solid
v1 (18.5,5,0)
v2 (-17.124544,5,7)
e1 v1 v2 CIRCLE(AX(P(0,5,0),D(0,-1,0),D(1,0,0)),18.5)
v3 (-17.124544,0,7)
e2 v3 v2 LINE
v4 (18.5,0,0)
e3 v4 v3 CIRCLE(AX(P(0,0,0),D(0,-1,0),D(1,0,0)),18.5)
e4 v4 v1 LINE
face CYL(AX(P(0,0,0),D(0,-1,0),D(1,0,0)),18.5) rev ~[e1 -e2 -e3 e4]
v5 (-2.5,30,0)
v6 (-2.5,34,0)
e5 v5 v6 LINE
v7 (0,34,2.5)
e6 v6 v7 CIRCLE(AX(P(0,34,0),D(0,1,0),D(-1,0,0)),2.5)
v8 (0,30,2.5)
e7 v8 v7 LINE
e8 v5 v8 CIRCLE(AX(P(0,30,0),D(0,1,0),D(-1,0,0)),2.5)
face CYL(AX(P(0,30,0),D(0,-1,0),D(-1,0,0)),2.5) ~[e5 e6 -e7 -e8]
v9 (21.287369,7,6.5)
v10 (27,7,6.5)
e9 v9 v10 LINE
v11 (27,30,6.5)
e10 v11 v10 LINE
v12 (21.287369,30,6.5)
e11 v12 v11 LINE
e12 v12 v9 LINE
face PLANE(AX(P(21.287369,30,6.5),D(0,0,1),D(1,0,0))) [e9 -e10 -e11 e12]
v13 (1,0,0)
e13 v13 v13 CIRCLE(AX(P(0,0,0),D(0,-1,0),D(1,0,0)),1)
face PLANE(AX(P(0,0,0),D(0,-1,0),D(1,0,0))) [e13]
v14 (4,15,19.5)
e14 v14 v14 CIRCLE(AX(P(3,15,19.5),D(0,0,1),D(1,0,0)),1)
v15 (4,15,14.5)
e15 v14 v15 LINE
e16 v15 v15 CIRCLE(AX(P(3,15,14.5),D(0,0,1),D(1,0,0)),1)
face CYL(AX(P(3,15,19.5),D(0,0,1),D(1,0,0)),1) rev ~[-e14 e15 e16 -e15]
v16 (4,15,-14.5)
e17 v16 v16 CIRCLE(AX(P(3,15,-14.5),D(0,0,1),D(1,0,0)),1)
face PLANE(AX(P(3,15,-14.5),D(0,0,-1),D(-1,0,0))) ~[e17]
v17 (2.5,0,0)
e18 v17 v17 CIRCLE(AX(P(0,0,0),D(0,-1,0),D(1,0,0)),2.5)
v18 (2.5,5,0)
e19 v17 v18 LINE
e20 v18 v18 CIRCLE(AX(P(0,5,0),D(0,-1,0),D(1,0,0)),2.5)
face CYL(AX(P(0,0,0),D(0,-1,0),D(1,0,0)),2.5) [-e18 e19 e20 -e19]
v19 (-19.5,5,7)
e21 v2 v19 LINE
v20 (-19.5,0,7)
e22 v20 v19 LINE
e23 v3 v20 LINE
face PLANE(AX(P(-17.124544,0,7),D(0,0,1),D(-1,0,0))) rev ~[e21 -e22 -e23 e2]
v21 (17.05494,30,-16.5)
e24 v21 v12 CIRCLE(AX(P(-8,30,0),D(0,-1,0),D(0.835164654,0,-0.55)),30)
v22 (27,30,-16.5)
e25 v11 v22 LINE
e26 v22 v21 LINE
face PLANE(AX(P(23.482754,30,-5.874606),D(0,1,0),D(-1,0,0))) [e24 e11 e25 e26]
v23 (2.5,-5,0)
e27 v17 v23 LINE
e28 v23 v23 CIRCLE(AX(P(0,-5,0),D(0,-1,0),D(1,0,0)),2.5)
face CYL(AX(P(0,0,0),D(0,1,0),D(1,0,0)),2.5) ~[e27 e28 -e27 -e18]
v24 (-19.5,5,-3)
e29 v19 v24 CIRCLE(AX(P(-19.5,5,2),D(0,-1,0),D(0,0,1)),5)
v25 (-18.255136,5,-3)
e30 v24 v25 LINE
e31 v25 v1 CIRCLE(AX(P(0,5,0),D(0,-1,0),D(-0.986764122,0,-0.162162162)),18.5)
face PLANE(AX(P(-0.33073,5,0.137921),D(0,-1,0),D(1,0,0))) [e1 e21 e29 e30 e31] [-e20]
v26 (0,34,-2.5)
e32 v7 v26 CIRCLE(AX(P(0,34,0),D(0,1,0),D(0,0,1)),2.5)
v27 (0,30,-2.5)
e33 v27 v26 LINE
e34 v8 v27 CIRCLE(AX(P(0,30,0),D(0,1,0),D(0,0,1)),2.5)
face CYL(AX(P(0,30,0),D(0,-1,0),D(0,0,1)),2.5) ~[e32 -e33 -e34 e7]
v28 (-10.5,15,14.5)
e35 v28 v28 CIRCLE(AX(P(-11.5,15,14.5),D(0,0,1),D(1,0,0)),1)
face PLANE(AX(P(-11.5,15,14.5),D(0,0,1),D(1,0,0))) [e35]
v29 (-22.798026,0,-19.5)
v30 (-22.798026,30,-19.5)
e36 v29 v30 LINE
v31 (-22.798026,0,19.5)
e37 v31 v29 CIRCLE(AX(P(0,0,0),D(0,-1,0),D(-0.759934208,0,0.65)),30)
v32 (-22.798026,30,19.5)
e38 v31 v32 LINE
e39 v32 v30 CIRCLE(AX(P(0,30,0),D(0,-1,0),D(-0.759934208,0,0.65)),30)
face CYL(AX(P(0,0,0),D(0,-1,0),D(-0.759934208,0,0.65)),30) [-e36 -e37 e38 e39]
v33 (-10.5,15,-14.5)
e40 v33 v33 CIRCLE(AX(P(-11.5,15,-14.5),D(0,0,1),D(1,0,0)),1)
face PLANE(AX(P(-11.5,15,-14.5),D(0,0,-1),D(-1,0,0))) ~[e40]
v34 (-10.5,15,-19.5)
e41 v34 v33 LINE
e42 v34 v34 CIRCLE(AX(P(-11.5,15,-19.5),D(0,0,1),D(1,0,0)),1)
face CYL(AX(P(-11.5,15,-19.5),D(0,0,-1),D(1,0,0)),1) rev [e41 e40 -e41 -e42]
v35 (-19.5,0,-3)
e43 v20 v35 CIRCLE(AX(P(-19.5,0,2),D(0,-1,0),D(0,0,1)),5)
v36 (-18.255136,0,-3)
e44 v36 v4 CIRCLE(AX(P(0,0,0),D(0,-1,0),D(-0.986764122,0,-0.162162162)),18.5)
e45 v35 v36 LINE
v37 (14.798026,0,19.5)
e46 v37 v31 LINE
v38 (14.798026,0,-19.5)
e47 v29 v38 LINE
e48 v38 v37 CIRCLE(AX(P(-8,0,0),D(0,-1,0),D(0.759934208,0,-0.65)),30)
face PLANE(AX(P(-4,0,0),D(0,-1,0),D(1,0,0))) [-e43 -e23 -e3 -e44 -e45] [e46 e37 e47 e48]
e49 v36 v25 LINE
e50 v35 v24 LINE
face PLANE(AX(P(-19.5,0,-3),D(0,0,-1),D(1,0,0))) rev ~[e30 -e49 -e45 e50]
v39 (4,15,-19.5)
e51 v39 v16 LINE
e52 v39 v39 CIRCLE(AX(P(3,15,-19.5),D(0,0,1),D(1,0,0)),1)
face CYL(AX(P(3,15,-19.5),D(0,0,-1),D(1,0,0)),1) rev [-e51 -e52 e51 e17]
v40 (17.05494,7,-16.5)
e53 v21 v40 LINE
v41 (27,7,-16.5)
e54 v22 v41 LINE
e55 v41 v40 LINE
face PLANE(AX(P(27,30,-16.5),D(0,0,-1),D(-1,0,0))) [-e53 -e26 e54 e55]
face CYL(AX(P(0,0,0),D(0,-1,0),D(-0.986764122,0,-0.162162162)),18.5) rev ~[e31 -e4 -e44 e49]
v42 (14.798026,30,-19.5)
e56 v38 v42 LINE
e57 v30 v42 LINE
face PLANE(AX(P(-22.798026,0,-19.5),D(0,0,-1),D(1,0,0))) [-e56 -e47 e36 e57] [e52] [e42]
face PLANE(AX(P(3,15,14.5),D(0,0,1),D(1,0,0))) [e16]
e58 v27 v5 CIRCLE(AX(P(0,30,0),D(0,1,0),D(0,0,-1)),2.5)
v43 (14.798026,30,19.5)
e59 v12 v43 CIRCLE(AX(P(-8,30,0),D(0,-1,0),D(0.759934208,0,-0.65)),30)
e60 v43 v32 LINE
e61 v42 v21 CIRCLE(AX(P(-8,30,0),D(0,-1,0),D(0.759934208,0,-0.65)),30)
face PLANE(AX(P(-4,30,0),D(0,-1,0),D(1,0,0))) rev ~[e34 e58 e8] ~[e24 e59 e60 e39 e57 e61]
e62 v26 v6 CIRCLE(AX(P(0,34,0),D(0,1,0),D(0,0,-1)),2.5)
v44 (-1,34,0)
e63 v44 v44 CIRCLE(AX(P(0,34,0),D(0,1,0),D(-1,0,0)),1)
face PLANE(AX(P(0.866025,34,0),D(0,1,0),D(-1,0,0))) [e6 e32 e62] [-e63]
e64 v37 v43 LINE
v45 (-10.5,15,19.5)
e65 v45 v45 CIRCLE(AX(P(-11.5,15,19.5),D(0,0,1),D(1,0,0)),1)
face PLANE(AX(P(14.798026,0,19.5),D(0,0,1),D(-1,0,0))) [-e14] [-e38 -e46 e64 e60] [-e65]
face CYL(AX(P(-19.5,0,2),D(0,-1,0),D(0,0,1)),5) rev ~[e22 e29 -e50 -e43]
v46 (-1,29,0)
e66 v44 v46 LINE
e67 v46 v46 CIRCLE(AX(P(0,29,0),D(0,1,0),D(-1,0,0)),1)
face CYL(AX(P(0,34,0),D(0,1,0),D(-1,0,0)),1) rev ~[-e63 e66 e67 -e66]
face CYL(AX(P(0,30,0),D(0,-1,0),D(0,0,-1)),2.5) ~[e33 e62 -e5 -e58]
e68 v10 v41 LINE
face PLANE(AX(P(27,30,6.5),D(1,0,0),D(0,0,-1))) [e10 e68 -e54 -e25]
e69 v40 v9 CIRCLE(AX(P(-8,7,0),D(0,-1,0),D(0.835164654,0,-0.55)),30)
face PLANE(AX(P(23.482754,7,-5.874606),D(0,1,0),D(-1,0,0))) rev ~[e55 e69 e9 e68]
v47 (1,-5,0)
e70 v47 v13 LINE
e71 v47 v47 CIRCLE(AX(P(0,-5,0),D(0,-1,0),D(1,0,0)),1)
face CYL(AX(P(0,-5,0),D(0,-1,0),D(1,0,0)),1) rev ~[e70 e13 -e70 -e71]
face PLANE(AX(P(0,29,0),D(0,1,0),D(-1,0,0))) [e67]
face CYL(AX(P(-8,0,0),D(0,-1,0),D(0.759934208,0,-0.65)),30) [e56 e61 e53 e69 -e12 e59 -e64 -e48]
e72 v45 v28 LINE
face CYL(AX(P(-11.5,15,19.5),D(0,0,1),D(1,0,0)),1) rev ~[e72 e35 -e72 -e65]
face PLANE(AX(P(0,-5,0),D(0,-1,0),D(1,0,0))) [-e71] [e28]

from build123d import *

# Parameters (mm, degrees)
F0_R      = 2.5
F1_DEPTH  = 30
F2_DEPTH  = 5
F3_DEPTH  = 5
F4_R      = 1
F5_DEPTH  = 5
F7_DEPTH  = 23
F8_DEPTH  = 4
F9_R      = 1
F10_DEPTH = 5
F11_R     = 1
F12_DEPTH = 5


# Not quite as in the source:
# - a pattern or mirror of a feature is missing from the dataset's text; its kind, count and spacing are read off the source's solid


with BuildPart() as f1:
    # F0 (on Front) → F1 (new body)
    with BuildSketch(Plane.XZ):
        with BuildLine():
            Line((14.7980262304, 19.5), (-22.7980262304, 19.5))
            ThreePointArc((-22.7980262304, 19.5), (-30, 0), (-22.7980262304, -19.5))
            Line((-22.7980262304, -19.5), (14.7980262304, -19.5))
            ThreePointArc((14.7980262304, -19.5), (22, 0), (14.7980262304, 19.5))
        make_face()
        with BuildLine():
            ThreePointArc((-17.1245437895, 7), (3.5669272416, 18.1528793874), (18.5, 0))
            ThreePointArc((18.5, 0), (1.5049882267, -18.4386824485), (-18.2551362635, -3))
            Line((-18.2551362635, -3), (-19.5, -3))
            ThreePointArc((-19.5, -3), (-24.5, 2), (-19.5, 7))
            Line((-19.5, 7), (-17.1245437895, 7))
        make_face(mode=Mode.SUBTRACT)
        with BuildLine():
            ThreePointArc((-18.2551362635, -3), (1.5049882267, -18.4386824485), (18.5, 0))
            ThreePointArc((18.5, 0), (3.5669272416, 18.1528793874), (-17.1245437895, 7))
            ThreePointArc((-17.1245437895, 7), (-17.2243437117, 6.7507024597), (-17.320514605, 6.4999826014))
            ThreePointArc((-17.320514605, 6.4999826014), (-15.2634077978, 4.6554258627), (-14.5, 2))
            ThreePointArc((-14.5, 2), (-15.5564468025, -1.0738230558), (-18.2793552714, -2.8487138961))
            ThreePointArc((-18.2793552714, -2.8487138961), (-18.2674023824, -2.9243820202), (-18.2551362635, -3))
        make_face()
        Circle(F0_R, mode=Mode.SUBTRACT)
        with BuildLine():
            ThreePointArc((-18.2793552714, -2.8487138961), (-18.4034566143, 1.8875340117), (-17.320514605, 6.4999826014))
            ThreePointArc((-17.320514605, 6.4999826014), (-18.3819465592, 6.8733927098), (-19.5, 7))
            ThreePointArc((-19.5, 7), (-24.5, 2), (-19.5, -3))
            ThreePointArc((-19.5, -3), (-18.885007919, -2.9620343349), (-18.2793552714, -2.8487138961))
        make_face()
        with BuildLine():
            ThreePointArc((-14.5, 2), (-15.2634077978, 4.6554258627), (-17.320514605, 6.4999826014))
            ThreePointArc((-17.320514605, 6.4999826014), (-18.4034566143, 1.8875340117), (-18.2793552714, -2.8487138961))
            ThreePointArc((-18.2793552714, -2.8487138961), (-15.5564468025, -1.0738230558), (-14.5, 2))
        make_face()
        with BuildLine():
            ThreePointArc((-17.320514605, 6.4999826014), (-17.2243437117, 6.7507024597), (-17.1245437895, 7))
            Line((-17.1245437895, 7), (-19.5, 7))
            ThreePointArc((-19.5, 7), (-18.3819465592, 6.8733927098), (-17.320514605, 6.4999826014))
        make_face()
        with BuildLine():
            Line((-19.5, -3), (-18.2551362635, -3))
            ThreePointArc((-18.2551362635, -3), (-18.2674023824, -2.9243820202), (-18.2793552714, -2.8487138961))
            ThreePointArc((-18.2793552714, -2.8487138961), (-18.885007919, -2.9620343349), (-19.5, -3))
        make_face()
        Circle(F0_R)
    extrude(amount=-F1_DEPTH)

    # F0 (on Front) → F2 (cut)
    with BuildSketch(Plane.XZ):
        with BuildLine():
            ThreePointArc((-18.2551362635, -3), (1.5049882267, -18.4386824485), (18.5, 0))
            ThreePointArc((18.5, 0), (3.5669272416, 18.1528793874), (-17.1245437895, 7))
            ThreePointArc((-17.1245437895, 7), (-17.2243437117, 6.7507024597), (-17.320514605, 6.4999826014))
            ThreePointArc((-17.320514605, 6.4999826014), (-15.2634077978, 4.6554258627), (-14.5, 2))
            ThreePointArc((-14.5, 2), (-15.5564468025, -1.0738230558), (-18.2793552714, -2.8487138961))
            ThreePointArc((-18.2793552714, -2.8487138961), (-18.2674023824, -2.9243820202), (-18.2551362635, -3))
        make_face()
        Circle(F0_R, mode=Mode.SUBTRACT)
        with BuildLine():
            ThreePointArc((-17.320514605, 6.4999826014), (-17.2243437117, 6.7507024597), (-17.1245437895, 7))
            Line((-17.1245437895, 7), (-19.5, 7))
            ThreePointArc((-19.5, 7), (-18.3819465592, 6.8733927098), (-17.320514605, 6.4999826014))
        make_face()
        with BuildLine():
            Line((-19.5, -3), (-18.2551362635, -3))
            ThreePointArc((-18.2551362635, -3), (-18.2674023824, -2.9243820202), (-18.2793552714, -2.8487138961))
            ThreePointArc((-18.2793552714, -2.8487138961), (-18.885007919, -2.9620343349), (-19.5, -3))
        make_face()
        with BuildLine():
            ThreePointArc((-18.2793552714, -2.8487138961), (-18.4034566143, 1.8875340117), (-17.320514605, 6.4999826014))
            ThreePointArc((-17.320514605, 6.4999826014), (-18.3819465592, 6.8733927098), (-19.5, 7))
            ThreePointArc((-19.5, 7), (-24.5, 2), (-19.5, -3))
            ThreePointArc((-19.5, -3), (-18.885007919, -2.9620343349), (-18.2793552714, -2.8487138961))
        make_face()
        with BuildLine():
            ThreePointArc((-14.5, 2), (-15.2634077978, 4.6554258627), (-17.320514605, 6.4999826014))
            ThreePointArc((-17.320514605, 6.4999826014), (-18.4034566143, 1.8875340117), (-18.2793552714, -2.8487138961))
            ThreePointArc((-18.2793552714, -2.8487138961), (-15.5564468025, -1.0738230558), (-14.5, 2))
        make_face()
    extrude(amount=-F2_DEPTH, mode=Mode.SUBTRACT)

    # F0 (on Front) → F3 (join)
    with BuildSketch(Plane.XZ):
        Circle(F0_R)
    extrude(amount=F3_DEPTH)

    # F4 (on face) → F5 (cut)
    with BuildSketch(Plane.XY.offset(19.5)):
        with Locations((-11.5, 15)):
            Circle(F4_R)
        with Locations((3, 15)):
            Circle(F4_R)
    f5 = extrude(amount=-F5_DEPTH, mode=Mode.SUBTRACT)

    # F5_copies: F5 across plane
    add(f5.mirror(Plane(origin=(0, 0, 0), x_dir=(-1, 0, 0), z_dir=(0, 0, -1))), mode=Mode.SUBTRACT)

    # F6 (on face) → F7 (join)
    with BuildSketch(Plane(origin=(0, 30, 0), x_dir=(-1, 0, 0), z_dir=(0, 1, 0))):
        with BuildLine():
            Line((-27, -16.5), (-17.0549396327, -16.5))
            ThreePointArc((-17.0549396327, -16.5), (-21.5046036204, -5.4293982359), (-21.2873692912, 6.5))
            Line((-21.2873692912, 6.5), (-27, 6.5))
            Line((-27, 6.5), (-27, -16.5))
        make_face()
    extrude(amount=-F7_DEPTH)

    # F6 (on face) → F8 (join)
    with BuildSketch(Plane(origin=(0, 30, 0), x_dir=(-1, 0, 0), z_dir=(0, 1, 0))):
        with BuildLine():
            ThreePointArc((0, 2.5), (-2.5, 0), (0, -2.5))
            Line((0, -2.5), (0, 2.5))
        make_face()
        with BuildLine():
            Line((0, 2.5), (0, -2.5))
            ThreePointArc((0, -2.5), (1.767766953, -1.767766953), (2.5, 0))
            ThreePointArc((2.5, 0), (1.767766953, 1.767766953), (0, 2.5))
        make_face()
    extrude(amount=F8_DEPTH)

    # F9 (on face) → F10 (cut)
    with BuildSketch(Plane.XZ.offset(5)):
        Circle(F9_R)
    extrude(amount=-F10_DEPTH, mode=Mode.SUBTRACT)

    # F11 (on face) → F12 (cut)
    with BuildSketch(Plane(origin=(0, 34, 0), x_dir=(-1, 0, 0), z_dir=(0, 1, 0))):
        Circle(F11_R)
    extrude(amount=-F12_DEPTH, mode=Mode.SUBTRACT)


solid = f1.part
